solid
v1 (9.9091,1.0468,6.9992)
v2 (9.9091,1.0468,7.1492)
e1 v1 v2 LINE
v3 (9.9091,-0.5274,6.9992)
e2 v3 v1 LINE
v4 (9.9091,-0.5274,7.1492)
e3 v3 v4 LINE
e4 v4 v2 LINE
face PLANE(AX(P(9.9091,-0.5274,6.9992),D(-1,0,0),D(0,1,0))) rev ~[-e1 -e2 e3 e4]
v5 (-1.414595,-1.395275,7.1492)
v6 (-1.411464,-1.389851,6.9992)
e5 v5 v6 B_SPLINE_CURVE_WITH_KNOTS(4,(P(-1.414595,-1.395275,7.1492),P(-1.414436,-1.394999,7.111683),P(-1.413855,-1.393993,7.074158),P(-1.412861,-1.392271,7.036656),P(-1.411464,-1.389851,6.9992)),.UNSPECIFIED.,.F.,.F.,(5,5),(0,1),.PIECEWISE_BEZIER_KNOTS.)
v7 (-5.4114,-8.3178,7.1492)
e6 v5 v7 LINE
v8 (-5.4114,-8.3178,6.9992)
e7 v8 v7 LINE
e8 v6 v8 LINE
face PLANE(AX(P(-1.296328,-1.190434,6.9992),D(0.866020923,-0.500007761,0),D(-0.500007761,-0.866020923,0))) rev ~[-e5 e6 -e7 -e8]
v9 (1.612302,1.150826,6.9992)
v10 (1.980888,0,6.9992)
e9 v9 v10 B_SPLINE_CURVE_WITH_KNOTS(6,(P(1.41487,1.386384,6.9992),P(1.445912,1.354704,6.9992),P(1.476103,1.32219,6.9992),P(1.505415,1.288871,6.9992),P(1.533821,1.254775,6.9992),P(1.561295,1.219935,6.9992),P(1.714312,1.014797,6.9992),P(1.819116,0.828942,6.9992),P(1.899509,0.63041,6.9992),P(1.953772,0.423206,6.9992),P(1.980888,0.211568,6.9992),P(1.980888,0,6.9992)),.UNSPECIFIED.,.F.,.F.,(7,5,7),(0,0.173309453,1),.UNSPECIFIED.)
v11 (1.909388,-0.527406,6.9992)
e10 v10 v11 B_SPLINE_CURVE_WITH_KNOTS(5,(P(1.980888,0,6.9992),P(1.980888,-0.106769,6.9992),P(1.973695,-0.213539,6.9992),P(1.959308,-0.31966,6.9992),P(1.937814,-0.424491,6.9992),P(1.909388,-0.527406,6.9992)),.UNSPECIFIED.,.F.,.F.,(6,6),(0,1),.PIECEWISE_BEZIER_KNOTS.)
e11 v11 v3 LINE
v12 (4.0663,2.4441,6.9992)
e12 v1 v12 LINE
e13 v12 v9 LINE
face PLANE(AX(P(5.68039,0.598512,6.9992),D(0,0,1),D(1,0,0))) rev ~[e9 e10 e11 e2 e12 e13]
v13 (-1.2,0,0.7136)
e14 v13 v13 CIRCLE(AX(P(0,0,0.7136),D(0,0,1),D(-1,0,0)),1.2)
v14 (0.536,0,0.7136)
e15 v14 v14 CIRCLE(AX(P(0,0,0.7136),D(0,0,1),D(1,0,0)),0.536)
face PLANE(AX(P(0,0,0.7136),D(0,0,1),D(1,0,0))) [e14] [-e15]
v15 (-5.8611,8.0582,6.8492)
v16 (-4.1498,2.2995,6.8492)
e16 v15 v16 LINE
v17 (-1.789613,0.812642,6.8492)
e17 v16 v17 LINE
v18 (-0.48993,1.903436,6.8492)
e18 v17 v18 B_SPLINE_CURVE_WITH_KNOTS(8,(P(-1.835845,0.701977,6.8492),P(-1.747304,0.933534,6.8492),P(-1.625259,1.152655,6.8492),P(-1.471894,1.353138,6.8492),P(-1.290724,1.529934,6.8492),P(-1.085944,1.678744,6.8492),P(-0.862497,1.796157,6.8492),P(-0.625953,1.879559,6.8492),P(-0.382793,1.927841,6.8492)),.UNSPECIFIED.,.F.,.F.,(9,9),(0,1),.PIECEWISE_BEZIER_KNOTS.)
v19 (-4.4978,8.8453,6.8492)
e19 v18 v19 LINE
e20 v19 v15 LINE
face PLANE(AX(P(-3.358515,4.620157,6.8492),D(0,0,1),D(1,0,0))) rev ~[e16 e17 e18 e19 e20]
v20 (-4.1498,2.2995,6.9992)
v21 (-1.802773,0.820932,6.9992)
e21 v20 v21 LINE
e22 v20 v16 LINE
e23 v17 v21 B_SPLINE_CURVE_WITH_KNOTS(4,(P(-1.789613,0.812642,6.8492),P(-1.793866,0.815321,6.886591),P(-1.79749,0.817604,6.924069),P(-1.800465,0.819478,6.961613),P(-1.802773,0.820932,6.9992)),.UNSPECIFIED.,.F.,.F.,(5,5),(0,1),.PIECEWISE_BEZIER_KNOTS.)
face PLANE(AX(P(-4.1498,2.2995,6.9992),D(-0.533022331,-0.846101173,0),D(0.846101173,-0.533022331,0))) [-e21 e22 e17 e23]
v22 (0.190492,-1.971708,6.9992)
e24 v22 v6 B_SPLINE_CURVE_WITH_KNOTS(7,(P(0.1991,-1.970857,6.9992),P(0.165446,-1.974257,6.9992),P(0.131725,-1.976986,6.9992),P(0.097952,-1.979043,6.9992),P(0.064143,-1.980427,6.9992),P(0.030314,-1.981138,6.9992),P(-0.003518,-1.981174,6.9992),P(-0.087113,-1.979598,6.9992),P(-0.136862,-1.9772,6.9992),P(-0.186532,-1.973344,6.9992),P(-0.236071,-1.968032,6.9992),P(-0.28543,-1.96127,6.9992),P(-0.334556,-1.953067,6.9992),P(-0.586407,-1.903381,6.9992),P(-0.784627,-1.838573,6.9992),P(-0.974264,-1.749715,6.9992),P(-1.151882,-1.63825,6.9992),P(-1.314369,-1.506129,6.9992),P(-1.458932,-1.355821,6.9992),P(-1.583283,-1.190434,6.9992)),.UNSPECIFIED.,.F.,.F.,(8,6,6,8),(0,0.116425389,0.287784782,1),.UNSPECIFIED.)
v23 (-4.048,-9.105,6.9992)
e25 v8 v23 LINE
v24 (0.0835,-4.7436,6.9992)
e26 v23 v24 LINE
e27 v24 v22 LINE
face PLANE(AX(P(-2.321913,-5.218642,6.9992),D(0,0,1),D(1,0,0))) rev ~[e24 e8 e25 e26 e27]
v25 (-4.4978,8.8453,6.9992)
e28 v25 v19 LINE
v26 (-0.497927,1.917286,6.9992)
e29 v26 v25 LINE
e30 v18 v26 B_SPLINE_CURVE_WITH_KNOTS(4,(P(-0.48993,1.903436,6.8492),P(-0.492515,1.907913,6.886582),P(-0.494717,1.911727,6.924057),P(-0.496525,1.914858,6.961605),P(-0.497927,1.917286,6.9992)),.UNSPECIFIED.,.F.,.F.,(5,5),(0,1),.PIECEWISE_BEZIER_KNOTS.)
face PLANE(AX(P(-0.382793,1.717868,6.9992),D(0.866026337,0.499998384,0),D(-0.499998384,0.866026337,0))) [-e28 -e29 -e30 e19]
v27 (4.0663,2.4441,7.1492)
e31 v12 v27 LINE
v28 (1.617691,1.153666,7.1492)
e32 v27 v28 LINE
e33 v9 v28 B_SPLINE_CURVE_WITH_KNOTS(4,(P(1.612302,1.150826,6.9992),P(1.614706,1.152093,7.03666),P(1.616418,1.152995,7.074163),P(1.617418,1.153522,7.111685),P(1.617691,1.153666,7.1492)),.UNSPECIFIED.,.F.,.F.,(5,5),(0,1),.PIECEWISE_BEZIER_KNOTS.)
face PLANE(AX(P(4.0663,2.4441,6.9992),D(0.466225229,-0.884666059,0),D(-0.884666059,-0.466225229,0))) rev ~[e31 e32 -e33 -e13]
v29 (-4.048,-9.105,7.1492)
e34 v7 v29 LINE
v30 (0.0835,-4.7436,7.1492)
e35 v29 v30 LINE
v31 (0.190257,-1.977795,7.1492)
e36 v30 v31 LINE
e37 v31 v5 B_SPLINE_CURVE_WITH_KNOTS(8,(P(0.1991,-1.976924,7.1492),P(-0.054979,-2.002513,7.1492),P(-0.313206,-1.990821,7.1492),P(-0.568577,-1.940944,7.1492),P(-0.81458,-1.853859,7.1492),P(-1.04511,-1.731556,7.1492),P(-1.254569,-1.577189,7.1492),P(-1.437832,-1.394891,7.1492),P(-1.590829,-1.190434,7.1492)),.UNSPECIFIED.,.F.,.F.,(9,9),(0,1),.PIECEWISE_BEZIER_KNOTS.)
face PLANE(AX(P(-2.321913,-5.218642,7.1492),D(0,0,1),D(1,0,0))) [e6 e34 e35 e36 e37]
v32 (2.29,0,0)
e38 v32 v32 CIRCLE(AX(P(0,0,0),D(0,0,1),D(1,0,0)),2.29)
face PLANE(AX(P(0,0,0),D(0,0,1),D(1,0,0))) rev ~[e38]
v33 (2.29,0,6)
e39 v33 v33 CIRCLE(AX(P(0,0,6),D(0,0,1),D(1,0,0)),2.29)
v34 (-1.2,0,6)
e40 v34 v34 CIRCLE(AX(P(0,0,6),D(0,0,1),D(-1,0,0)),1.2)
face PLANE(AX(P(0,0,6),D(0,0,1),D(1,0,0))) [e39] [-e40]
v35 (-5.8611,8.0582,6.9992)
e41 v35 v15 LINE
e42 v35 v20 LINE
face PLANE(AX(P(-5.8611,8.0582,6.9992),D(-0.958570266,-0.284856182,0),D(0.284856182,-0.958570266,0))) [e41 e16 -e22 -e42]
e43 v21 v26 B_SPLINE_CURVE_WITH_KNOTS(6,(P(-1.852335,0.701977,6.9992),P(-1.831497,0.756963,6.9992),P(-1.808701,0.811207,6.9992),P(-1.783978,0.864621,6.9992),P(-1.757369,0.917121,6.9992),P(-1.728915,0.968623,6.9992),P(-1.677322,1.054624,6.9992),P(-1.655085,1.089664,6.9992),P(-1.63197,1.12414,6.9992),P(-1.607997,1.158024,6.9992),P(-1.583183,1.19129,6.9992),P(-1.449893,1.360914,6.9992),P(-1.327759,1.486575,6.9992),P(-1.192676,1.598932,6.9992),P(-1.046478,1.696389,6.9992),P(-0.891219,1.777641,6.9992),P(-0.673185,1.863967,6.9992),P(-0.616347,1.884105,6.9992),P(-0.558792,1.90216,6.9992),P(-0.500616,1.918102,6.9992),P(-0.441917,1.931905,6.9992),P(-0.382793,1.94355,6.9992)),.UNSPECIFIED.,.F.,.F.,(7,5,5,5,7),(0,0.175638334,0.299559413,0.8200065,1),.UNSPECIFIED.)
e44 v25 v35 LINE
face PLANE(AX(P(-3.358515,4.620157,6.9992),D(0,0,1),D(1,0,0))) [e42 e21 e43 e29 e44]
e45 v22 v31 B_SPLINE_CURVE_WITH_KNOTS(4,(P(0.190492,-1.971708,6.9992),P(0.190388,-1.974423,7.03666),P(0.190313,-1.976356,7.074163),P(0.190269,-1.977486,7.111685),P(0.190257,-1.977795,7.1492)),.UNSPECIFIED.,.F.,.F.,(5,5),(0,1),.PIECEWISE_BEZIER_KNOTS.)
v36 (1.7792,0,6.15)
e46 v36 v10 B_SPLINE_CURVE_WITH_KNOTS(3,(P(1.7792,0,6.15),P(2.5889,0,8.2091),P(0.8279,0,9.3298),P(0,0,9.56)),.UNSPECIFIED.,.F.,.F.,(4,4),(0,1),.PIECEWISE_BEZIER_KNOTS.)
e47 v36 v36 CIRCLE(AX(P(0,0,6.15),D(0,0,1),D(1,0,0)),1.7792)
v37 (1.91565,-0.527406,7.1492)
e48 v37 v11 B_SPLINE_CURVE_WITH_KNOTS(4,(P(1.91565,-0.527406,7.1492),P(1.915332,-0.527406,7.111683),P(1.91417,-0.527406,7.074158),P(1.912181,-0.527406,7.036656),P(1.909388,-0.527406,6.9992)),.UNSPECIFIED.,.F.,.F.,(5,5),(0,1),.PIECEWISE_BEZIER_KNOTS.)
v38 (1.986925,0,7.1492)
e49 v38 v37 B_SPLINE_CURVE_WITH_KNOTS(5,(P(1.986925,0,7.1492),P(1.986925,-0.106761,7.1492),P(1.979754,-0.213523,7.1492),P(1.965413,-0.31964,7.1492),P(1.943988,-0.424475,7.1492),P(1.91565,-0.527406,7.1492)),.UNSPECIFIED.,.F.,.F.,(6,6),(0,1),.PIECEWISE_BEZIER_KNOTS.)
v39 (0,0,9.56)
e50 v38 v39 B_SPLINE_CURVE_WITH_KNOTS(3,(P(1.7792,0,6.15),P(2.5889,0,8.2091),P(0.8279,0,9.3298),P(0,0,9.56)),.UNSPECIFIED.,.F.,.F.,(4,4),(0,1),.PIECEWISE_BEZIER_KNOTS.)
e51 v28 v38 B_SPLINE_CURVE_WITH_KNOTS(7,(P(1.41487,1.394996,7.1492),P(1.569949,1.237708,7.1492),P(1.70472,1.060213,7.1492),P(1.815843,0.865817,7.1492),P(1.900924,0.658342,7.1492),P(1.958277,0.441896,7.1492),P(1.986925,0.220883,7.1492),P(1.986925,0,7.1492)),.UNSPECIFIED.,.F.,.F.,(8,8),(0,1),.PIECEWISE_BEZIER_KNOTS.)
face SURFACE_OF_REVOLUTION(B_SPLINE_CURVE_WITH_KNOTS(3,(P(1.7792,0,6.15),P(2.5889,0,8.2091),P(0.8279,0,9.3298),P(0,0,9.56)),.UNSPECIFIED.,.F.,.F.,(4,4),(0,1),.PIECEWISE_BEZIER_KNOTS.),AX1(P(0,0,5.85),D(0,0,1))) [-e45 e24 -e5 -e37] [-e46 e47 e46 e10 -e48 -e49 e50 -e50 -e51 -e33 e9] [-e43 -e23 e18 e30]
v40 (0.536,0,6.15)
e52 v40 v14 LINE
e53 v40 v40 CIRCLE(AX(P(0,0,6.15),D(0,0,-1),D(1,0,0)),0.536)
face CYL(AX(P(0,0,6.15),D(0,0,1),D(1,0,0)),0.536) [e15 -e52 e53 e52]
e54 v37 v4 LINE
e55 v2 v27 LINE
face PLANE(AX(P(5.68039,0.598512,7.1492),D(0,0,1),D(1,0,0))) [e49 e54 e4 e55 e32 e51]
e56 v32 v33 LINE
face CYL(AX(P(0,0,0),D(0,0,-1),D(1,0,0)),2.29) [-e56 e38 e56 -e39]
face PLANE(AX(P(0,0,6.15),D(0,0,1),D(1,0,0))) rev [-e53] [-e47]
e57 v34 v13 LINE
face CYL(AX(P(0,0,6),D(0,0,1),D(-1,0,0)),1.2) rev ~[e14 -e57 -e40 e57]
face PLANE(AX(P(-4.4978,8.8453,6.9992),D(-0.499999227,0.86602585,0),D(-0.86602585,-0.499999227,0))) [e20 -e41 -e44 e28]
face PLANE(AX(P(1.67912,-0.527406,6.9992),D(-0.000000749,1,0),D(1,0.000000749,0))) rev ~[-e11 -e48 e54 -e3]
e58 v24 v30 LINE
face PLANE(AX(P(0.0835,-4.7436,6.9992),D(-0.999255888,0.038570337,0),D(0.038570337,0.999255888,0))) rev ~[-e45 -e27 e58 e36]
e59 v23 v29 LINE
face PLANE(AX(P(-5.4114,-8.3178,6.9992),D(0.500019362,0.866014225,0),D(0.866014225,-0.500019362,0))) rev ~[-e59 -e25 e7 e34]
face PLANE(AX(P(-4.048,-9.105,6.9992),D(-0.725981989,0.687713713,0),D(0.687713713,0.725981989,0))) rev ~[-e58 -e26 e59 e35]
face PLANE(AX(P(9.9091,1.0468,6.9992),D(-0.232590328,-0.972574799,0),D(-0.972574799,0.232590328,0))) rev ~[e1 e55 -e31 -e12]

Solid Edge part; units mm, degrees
sketch "Sketch1" plane through (0, 0, 0) normal (0, 0, 1) x (1, 0, 0)
  circle A0 centre (0, 0) radius 2.29
extrude "Protrusion1" add sketch "Sketch1" along normal blind 6
sketch "Sketch2" plane through (0, 0, 0) normal (0, -1, 0) x (1, 0, 0)
  spline S0 degree 3 poles (1.7792, 6.15) (2.5889, 8.2091) (0.8279, 9.3298) (0, 9.56) knots 0 0 0 0 1 1 1 1
  line L0 (0, 6.15) -> (0, 9.56)
  line L1 (0, 6.15) -> (1.7792, 6.15)
revolve "RevolvedProtrusion1" add sketch "Sketch2" angle 360 about axis through (0, 0, 5.85) along (0, 0, 1)
sketch "Sketch3" plane through (0, 0, 6.9992) normal (0, 0, 1) x (1, 0, 0)
  line L0 (-4.048, -9.105) -> (0.0835, -4.7436)
  line L1 (-5.4114, -8.3178) -> (-4.048, -9.105)
  line L2 (-1.2964, -1.1905) -> (-5.4114, -8.3178)
  arc A0 (0.1991, -1.7487) -> (-1.2964, -1.1905) centre (0, 0) cw
  line L3 (0.0835, -4.7436) -> (0.1991, -1.7487)
  line L4 (1.6791, -0.5274) -> (9.9091, -0.5274)
  line L5 (9.9091, -0.5274) -> (9.9091, 1.0468)
  line L6 (9.9091, 1.0468) -> (4.0663, 2.4441)
  line L7 (4.0663, 2.4441) -> (1.4149, 1.0468)
  arc A1 (1.4149, 1.0468) -> (1.6791, -0.5274) centre (0, 0) cw
extrude "ExtrudedProtrusion_6" add sketch "Sketch3" along normal blind 0.15
sketch "Sketch4" plane through (0, 0, 6.9992) normal (0, 0, 1) x (1, 0, 0)
  line L0 (-5.8611, 8.0582) -> (-4.1498, 2.2995)
  line L1 (-4.1498, 2.2995) -> (-1.614, 0.702)
  arc A0 (-1.614, 0.702) -> (-0.3828, 1.7179) centre (0, 0) cw
  line L2 (-0.3828, 1.7179) -> (-4.4978, 8.8453)
  line L3 (-4.4978, 8.8453) -> (-5.8611, 8.0582)
extrude "ExtrudedProtrusion_7" add sketch "Sketch4" against normal blind 0.15
sketch "Sketch5" plane through (0, 0, 6) normal (0, 0, 1) x (-1, 0, 0)
  circle A0 centre (0, 0) radius 1.2
extrude "ExtrudedCutout_2" cut sketch "Sketch5" against normal blind 5.2864
sketch "Sketch6" plane through (0, 0, 6.15) normal (0, 0, -1) x (1, 0, 0)
  circle A0 centre (0, 0) radius 0.536
extrude "Protrusion2" add sketch "Sketch6" along normal up to vertex (6.15 mm away)
